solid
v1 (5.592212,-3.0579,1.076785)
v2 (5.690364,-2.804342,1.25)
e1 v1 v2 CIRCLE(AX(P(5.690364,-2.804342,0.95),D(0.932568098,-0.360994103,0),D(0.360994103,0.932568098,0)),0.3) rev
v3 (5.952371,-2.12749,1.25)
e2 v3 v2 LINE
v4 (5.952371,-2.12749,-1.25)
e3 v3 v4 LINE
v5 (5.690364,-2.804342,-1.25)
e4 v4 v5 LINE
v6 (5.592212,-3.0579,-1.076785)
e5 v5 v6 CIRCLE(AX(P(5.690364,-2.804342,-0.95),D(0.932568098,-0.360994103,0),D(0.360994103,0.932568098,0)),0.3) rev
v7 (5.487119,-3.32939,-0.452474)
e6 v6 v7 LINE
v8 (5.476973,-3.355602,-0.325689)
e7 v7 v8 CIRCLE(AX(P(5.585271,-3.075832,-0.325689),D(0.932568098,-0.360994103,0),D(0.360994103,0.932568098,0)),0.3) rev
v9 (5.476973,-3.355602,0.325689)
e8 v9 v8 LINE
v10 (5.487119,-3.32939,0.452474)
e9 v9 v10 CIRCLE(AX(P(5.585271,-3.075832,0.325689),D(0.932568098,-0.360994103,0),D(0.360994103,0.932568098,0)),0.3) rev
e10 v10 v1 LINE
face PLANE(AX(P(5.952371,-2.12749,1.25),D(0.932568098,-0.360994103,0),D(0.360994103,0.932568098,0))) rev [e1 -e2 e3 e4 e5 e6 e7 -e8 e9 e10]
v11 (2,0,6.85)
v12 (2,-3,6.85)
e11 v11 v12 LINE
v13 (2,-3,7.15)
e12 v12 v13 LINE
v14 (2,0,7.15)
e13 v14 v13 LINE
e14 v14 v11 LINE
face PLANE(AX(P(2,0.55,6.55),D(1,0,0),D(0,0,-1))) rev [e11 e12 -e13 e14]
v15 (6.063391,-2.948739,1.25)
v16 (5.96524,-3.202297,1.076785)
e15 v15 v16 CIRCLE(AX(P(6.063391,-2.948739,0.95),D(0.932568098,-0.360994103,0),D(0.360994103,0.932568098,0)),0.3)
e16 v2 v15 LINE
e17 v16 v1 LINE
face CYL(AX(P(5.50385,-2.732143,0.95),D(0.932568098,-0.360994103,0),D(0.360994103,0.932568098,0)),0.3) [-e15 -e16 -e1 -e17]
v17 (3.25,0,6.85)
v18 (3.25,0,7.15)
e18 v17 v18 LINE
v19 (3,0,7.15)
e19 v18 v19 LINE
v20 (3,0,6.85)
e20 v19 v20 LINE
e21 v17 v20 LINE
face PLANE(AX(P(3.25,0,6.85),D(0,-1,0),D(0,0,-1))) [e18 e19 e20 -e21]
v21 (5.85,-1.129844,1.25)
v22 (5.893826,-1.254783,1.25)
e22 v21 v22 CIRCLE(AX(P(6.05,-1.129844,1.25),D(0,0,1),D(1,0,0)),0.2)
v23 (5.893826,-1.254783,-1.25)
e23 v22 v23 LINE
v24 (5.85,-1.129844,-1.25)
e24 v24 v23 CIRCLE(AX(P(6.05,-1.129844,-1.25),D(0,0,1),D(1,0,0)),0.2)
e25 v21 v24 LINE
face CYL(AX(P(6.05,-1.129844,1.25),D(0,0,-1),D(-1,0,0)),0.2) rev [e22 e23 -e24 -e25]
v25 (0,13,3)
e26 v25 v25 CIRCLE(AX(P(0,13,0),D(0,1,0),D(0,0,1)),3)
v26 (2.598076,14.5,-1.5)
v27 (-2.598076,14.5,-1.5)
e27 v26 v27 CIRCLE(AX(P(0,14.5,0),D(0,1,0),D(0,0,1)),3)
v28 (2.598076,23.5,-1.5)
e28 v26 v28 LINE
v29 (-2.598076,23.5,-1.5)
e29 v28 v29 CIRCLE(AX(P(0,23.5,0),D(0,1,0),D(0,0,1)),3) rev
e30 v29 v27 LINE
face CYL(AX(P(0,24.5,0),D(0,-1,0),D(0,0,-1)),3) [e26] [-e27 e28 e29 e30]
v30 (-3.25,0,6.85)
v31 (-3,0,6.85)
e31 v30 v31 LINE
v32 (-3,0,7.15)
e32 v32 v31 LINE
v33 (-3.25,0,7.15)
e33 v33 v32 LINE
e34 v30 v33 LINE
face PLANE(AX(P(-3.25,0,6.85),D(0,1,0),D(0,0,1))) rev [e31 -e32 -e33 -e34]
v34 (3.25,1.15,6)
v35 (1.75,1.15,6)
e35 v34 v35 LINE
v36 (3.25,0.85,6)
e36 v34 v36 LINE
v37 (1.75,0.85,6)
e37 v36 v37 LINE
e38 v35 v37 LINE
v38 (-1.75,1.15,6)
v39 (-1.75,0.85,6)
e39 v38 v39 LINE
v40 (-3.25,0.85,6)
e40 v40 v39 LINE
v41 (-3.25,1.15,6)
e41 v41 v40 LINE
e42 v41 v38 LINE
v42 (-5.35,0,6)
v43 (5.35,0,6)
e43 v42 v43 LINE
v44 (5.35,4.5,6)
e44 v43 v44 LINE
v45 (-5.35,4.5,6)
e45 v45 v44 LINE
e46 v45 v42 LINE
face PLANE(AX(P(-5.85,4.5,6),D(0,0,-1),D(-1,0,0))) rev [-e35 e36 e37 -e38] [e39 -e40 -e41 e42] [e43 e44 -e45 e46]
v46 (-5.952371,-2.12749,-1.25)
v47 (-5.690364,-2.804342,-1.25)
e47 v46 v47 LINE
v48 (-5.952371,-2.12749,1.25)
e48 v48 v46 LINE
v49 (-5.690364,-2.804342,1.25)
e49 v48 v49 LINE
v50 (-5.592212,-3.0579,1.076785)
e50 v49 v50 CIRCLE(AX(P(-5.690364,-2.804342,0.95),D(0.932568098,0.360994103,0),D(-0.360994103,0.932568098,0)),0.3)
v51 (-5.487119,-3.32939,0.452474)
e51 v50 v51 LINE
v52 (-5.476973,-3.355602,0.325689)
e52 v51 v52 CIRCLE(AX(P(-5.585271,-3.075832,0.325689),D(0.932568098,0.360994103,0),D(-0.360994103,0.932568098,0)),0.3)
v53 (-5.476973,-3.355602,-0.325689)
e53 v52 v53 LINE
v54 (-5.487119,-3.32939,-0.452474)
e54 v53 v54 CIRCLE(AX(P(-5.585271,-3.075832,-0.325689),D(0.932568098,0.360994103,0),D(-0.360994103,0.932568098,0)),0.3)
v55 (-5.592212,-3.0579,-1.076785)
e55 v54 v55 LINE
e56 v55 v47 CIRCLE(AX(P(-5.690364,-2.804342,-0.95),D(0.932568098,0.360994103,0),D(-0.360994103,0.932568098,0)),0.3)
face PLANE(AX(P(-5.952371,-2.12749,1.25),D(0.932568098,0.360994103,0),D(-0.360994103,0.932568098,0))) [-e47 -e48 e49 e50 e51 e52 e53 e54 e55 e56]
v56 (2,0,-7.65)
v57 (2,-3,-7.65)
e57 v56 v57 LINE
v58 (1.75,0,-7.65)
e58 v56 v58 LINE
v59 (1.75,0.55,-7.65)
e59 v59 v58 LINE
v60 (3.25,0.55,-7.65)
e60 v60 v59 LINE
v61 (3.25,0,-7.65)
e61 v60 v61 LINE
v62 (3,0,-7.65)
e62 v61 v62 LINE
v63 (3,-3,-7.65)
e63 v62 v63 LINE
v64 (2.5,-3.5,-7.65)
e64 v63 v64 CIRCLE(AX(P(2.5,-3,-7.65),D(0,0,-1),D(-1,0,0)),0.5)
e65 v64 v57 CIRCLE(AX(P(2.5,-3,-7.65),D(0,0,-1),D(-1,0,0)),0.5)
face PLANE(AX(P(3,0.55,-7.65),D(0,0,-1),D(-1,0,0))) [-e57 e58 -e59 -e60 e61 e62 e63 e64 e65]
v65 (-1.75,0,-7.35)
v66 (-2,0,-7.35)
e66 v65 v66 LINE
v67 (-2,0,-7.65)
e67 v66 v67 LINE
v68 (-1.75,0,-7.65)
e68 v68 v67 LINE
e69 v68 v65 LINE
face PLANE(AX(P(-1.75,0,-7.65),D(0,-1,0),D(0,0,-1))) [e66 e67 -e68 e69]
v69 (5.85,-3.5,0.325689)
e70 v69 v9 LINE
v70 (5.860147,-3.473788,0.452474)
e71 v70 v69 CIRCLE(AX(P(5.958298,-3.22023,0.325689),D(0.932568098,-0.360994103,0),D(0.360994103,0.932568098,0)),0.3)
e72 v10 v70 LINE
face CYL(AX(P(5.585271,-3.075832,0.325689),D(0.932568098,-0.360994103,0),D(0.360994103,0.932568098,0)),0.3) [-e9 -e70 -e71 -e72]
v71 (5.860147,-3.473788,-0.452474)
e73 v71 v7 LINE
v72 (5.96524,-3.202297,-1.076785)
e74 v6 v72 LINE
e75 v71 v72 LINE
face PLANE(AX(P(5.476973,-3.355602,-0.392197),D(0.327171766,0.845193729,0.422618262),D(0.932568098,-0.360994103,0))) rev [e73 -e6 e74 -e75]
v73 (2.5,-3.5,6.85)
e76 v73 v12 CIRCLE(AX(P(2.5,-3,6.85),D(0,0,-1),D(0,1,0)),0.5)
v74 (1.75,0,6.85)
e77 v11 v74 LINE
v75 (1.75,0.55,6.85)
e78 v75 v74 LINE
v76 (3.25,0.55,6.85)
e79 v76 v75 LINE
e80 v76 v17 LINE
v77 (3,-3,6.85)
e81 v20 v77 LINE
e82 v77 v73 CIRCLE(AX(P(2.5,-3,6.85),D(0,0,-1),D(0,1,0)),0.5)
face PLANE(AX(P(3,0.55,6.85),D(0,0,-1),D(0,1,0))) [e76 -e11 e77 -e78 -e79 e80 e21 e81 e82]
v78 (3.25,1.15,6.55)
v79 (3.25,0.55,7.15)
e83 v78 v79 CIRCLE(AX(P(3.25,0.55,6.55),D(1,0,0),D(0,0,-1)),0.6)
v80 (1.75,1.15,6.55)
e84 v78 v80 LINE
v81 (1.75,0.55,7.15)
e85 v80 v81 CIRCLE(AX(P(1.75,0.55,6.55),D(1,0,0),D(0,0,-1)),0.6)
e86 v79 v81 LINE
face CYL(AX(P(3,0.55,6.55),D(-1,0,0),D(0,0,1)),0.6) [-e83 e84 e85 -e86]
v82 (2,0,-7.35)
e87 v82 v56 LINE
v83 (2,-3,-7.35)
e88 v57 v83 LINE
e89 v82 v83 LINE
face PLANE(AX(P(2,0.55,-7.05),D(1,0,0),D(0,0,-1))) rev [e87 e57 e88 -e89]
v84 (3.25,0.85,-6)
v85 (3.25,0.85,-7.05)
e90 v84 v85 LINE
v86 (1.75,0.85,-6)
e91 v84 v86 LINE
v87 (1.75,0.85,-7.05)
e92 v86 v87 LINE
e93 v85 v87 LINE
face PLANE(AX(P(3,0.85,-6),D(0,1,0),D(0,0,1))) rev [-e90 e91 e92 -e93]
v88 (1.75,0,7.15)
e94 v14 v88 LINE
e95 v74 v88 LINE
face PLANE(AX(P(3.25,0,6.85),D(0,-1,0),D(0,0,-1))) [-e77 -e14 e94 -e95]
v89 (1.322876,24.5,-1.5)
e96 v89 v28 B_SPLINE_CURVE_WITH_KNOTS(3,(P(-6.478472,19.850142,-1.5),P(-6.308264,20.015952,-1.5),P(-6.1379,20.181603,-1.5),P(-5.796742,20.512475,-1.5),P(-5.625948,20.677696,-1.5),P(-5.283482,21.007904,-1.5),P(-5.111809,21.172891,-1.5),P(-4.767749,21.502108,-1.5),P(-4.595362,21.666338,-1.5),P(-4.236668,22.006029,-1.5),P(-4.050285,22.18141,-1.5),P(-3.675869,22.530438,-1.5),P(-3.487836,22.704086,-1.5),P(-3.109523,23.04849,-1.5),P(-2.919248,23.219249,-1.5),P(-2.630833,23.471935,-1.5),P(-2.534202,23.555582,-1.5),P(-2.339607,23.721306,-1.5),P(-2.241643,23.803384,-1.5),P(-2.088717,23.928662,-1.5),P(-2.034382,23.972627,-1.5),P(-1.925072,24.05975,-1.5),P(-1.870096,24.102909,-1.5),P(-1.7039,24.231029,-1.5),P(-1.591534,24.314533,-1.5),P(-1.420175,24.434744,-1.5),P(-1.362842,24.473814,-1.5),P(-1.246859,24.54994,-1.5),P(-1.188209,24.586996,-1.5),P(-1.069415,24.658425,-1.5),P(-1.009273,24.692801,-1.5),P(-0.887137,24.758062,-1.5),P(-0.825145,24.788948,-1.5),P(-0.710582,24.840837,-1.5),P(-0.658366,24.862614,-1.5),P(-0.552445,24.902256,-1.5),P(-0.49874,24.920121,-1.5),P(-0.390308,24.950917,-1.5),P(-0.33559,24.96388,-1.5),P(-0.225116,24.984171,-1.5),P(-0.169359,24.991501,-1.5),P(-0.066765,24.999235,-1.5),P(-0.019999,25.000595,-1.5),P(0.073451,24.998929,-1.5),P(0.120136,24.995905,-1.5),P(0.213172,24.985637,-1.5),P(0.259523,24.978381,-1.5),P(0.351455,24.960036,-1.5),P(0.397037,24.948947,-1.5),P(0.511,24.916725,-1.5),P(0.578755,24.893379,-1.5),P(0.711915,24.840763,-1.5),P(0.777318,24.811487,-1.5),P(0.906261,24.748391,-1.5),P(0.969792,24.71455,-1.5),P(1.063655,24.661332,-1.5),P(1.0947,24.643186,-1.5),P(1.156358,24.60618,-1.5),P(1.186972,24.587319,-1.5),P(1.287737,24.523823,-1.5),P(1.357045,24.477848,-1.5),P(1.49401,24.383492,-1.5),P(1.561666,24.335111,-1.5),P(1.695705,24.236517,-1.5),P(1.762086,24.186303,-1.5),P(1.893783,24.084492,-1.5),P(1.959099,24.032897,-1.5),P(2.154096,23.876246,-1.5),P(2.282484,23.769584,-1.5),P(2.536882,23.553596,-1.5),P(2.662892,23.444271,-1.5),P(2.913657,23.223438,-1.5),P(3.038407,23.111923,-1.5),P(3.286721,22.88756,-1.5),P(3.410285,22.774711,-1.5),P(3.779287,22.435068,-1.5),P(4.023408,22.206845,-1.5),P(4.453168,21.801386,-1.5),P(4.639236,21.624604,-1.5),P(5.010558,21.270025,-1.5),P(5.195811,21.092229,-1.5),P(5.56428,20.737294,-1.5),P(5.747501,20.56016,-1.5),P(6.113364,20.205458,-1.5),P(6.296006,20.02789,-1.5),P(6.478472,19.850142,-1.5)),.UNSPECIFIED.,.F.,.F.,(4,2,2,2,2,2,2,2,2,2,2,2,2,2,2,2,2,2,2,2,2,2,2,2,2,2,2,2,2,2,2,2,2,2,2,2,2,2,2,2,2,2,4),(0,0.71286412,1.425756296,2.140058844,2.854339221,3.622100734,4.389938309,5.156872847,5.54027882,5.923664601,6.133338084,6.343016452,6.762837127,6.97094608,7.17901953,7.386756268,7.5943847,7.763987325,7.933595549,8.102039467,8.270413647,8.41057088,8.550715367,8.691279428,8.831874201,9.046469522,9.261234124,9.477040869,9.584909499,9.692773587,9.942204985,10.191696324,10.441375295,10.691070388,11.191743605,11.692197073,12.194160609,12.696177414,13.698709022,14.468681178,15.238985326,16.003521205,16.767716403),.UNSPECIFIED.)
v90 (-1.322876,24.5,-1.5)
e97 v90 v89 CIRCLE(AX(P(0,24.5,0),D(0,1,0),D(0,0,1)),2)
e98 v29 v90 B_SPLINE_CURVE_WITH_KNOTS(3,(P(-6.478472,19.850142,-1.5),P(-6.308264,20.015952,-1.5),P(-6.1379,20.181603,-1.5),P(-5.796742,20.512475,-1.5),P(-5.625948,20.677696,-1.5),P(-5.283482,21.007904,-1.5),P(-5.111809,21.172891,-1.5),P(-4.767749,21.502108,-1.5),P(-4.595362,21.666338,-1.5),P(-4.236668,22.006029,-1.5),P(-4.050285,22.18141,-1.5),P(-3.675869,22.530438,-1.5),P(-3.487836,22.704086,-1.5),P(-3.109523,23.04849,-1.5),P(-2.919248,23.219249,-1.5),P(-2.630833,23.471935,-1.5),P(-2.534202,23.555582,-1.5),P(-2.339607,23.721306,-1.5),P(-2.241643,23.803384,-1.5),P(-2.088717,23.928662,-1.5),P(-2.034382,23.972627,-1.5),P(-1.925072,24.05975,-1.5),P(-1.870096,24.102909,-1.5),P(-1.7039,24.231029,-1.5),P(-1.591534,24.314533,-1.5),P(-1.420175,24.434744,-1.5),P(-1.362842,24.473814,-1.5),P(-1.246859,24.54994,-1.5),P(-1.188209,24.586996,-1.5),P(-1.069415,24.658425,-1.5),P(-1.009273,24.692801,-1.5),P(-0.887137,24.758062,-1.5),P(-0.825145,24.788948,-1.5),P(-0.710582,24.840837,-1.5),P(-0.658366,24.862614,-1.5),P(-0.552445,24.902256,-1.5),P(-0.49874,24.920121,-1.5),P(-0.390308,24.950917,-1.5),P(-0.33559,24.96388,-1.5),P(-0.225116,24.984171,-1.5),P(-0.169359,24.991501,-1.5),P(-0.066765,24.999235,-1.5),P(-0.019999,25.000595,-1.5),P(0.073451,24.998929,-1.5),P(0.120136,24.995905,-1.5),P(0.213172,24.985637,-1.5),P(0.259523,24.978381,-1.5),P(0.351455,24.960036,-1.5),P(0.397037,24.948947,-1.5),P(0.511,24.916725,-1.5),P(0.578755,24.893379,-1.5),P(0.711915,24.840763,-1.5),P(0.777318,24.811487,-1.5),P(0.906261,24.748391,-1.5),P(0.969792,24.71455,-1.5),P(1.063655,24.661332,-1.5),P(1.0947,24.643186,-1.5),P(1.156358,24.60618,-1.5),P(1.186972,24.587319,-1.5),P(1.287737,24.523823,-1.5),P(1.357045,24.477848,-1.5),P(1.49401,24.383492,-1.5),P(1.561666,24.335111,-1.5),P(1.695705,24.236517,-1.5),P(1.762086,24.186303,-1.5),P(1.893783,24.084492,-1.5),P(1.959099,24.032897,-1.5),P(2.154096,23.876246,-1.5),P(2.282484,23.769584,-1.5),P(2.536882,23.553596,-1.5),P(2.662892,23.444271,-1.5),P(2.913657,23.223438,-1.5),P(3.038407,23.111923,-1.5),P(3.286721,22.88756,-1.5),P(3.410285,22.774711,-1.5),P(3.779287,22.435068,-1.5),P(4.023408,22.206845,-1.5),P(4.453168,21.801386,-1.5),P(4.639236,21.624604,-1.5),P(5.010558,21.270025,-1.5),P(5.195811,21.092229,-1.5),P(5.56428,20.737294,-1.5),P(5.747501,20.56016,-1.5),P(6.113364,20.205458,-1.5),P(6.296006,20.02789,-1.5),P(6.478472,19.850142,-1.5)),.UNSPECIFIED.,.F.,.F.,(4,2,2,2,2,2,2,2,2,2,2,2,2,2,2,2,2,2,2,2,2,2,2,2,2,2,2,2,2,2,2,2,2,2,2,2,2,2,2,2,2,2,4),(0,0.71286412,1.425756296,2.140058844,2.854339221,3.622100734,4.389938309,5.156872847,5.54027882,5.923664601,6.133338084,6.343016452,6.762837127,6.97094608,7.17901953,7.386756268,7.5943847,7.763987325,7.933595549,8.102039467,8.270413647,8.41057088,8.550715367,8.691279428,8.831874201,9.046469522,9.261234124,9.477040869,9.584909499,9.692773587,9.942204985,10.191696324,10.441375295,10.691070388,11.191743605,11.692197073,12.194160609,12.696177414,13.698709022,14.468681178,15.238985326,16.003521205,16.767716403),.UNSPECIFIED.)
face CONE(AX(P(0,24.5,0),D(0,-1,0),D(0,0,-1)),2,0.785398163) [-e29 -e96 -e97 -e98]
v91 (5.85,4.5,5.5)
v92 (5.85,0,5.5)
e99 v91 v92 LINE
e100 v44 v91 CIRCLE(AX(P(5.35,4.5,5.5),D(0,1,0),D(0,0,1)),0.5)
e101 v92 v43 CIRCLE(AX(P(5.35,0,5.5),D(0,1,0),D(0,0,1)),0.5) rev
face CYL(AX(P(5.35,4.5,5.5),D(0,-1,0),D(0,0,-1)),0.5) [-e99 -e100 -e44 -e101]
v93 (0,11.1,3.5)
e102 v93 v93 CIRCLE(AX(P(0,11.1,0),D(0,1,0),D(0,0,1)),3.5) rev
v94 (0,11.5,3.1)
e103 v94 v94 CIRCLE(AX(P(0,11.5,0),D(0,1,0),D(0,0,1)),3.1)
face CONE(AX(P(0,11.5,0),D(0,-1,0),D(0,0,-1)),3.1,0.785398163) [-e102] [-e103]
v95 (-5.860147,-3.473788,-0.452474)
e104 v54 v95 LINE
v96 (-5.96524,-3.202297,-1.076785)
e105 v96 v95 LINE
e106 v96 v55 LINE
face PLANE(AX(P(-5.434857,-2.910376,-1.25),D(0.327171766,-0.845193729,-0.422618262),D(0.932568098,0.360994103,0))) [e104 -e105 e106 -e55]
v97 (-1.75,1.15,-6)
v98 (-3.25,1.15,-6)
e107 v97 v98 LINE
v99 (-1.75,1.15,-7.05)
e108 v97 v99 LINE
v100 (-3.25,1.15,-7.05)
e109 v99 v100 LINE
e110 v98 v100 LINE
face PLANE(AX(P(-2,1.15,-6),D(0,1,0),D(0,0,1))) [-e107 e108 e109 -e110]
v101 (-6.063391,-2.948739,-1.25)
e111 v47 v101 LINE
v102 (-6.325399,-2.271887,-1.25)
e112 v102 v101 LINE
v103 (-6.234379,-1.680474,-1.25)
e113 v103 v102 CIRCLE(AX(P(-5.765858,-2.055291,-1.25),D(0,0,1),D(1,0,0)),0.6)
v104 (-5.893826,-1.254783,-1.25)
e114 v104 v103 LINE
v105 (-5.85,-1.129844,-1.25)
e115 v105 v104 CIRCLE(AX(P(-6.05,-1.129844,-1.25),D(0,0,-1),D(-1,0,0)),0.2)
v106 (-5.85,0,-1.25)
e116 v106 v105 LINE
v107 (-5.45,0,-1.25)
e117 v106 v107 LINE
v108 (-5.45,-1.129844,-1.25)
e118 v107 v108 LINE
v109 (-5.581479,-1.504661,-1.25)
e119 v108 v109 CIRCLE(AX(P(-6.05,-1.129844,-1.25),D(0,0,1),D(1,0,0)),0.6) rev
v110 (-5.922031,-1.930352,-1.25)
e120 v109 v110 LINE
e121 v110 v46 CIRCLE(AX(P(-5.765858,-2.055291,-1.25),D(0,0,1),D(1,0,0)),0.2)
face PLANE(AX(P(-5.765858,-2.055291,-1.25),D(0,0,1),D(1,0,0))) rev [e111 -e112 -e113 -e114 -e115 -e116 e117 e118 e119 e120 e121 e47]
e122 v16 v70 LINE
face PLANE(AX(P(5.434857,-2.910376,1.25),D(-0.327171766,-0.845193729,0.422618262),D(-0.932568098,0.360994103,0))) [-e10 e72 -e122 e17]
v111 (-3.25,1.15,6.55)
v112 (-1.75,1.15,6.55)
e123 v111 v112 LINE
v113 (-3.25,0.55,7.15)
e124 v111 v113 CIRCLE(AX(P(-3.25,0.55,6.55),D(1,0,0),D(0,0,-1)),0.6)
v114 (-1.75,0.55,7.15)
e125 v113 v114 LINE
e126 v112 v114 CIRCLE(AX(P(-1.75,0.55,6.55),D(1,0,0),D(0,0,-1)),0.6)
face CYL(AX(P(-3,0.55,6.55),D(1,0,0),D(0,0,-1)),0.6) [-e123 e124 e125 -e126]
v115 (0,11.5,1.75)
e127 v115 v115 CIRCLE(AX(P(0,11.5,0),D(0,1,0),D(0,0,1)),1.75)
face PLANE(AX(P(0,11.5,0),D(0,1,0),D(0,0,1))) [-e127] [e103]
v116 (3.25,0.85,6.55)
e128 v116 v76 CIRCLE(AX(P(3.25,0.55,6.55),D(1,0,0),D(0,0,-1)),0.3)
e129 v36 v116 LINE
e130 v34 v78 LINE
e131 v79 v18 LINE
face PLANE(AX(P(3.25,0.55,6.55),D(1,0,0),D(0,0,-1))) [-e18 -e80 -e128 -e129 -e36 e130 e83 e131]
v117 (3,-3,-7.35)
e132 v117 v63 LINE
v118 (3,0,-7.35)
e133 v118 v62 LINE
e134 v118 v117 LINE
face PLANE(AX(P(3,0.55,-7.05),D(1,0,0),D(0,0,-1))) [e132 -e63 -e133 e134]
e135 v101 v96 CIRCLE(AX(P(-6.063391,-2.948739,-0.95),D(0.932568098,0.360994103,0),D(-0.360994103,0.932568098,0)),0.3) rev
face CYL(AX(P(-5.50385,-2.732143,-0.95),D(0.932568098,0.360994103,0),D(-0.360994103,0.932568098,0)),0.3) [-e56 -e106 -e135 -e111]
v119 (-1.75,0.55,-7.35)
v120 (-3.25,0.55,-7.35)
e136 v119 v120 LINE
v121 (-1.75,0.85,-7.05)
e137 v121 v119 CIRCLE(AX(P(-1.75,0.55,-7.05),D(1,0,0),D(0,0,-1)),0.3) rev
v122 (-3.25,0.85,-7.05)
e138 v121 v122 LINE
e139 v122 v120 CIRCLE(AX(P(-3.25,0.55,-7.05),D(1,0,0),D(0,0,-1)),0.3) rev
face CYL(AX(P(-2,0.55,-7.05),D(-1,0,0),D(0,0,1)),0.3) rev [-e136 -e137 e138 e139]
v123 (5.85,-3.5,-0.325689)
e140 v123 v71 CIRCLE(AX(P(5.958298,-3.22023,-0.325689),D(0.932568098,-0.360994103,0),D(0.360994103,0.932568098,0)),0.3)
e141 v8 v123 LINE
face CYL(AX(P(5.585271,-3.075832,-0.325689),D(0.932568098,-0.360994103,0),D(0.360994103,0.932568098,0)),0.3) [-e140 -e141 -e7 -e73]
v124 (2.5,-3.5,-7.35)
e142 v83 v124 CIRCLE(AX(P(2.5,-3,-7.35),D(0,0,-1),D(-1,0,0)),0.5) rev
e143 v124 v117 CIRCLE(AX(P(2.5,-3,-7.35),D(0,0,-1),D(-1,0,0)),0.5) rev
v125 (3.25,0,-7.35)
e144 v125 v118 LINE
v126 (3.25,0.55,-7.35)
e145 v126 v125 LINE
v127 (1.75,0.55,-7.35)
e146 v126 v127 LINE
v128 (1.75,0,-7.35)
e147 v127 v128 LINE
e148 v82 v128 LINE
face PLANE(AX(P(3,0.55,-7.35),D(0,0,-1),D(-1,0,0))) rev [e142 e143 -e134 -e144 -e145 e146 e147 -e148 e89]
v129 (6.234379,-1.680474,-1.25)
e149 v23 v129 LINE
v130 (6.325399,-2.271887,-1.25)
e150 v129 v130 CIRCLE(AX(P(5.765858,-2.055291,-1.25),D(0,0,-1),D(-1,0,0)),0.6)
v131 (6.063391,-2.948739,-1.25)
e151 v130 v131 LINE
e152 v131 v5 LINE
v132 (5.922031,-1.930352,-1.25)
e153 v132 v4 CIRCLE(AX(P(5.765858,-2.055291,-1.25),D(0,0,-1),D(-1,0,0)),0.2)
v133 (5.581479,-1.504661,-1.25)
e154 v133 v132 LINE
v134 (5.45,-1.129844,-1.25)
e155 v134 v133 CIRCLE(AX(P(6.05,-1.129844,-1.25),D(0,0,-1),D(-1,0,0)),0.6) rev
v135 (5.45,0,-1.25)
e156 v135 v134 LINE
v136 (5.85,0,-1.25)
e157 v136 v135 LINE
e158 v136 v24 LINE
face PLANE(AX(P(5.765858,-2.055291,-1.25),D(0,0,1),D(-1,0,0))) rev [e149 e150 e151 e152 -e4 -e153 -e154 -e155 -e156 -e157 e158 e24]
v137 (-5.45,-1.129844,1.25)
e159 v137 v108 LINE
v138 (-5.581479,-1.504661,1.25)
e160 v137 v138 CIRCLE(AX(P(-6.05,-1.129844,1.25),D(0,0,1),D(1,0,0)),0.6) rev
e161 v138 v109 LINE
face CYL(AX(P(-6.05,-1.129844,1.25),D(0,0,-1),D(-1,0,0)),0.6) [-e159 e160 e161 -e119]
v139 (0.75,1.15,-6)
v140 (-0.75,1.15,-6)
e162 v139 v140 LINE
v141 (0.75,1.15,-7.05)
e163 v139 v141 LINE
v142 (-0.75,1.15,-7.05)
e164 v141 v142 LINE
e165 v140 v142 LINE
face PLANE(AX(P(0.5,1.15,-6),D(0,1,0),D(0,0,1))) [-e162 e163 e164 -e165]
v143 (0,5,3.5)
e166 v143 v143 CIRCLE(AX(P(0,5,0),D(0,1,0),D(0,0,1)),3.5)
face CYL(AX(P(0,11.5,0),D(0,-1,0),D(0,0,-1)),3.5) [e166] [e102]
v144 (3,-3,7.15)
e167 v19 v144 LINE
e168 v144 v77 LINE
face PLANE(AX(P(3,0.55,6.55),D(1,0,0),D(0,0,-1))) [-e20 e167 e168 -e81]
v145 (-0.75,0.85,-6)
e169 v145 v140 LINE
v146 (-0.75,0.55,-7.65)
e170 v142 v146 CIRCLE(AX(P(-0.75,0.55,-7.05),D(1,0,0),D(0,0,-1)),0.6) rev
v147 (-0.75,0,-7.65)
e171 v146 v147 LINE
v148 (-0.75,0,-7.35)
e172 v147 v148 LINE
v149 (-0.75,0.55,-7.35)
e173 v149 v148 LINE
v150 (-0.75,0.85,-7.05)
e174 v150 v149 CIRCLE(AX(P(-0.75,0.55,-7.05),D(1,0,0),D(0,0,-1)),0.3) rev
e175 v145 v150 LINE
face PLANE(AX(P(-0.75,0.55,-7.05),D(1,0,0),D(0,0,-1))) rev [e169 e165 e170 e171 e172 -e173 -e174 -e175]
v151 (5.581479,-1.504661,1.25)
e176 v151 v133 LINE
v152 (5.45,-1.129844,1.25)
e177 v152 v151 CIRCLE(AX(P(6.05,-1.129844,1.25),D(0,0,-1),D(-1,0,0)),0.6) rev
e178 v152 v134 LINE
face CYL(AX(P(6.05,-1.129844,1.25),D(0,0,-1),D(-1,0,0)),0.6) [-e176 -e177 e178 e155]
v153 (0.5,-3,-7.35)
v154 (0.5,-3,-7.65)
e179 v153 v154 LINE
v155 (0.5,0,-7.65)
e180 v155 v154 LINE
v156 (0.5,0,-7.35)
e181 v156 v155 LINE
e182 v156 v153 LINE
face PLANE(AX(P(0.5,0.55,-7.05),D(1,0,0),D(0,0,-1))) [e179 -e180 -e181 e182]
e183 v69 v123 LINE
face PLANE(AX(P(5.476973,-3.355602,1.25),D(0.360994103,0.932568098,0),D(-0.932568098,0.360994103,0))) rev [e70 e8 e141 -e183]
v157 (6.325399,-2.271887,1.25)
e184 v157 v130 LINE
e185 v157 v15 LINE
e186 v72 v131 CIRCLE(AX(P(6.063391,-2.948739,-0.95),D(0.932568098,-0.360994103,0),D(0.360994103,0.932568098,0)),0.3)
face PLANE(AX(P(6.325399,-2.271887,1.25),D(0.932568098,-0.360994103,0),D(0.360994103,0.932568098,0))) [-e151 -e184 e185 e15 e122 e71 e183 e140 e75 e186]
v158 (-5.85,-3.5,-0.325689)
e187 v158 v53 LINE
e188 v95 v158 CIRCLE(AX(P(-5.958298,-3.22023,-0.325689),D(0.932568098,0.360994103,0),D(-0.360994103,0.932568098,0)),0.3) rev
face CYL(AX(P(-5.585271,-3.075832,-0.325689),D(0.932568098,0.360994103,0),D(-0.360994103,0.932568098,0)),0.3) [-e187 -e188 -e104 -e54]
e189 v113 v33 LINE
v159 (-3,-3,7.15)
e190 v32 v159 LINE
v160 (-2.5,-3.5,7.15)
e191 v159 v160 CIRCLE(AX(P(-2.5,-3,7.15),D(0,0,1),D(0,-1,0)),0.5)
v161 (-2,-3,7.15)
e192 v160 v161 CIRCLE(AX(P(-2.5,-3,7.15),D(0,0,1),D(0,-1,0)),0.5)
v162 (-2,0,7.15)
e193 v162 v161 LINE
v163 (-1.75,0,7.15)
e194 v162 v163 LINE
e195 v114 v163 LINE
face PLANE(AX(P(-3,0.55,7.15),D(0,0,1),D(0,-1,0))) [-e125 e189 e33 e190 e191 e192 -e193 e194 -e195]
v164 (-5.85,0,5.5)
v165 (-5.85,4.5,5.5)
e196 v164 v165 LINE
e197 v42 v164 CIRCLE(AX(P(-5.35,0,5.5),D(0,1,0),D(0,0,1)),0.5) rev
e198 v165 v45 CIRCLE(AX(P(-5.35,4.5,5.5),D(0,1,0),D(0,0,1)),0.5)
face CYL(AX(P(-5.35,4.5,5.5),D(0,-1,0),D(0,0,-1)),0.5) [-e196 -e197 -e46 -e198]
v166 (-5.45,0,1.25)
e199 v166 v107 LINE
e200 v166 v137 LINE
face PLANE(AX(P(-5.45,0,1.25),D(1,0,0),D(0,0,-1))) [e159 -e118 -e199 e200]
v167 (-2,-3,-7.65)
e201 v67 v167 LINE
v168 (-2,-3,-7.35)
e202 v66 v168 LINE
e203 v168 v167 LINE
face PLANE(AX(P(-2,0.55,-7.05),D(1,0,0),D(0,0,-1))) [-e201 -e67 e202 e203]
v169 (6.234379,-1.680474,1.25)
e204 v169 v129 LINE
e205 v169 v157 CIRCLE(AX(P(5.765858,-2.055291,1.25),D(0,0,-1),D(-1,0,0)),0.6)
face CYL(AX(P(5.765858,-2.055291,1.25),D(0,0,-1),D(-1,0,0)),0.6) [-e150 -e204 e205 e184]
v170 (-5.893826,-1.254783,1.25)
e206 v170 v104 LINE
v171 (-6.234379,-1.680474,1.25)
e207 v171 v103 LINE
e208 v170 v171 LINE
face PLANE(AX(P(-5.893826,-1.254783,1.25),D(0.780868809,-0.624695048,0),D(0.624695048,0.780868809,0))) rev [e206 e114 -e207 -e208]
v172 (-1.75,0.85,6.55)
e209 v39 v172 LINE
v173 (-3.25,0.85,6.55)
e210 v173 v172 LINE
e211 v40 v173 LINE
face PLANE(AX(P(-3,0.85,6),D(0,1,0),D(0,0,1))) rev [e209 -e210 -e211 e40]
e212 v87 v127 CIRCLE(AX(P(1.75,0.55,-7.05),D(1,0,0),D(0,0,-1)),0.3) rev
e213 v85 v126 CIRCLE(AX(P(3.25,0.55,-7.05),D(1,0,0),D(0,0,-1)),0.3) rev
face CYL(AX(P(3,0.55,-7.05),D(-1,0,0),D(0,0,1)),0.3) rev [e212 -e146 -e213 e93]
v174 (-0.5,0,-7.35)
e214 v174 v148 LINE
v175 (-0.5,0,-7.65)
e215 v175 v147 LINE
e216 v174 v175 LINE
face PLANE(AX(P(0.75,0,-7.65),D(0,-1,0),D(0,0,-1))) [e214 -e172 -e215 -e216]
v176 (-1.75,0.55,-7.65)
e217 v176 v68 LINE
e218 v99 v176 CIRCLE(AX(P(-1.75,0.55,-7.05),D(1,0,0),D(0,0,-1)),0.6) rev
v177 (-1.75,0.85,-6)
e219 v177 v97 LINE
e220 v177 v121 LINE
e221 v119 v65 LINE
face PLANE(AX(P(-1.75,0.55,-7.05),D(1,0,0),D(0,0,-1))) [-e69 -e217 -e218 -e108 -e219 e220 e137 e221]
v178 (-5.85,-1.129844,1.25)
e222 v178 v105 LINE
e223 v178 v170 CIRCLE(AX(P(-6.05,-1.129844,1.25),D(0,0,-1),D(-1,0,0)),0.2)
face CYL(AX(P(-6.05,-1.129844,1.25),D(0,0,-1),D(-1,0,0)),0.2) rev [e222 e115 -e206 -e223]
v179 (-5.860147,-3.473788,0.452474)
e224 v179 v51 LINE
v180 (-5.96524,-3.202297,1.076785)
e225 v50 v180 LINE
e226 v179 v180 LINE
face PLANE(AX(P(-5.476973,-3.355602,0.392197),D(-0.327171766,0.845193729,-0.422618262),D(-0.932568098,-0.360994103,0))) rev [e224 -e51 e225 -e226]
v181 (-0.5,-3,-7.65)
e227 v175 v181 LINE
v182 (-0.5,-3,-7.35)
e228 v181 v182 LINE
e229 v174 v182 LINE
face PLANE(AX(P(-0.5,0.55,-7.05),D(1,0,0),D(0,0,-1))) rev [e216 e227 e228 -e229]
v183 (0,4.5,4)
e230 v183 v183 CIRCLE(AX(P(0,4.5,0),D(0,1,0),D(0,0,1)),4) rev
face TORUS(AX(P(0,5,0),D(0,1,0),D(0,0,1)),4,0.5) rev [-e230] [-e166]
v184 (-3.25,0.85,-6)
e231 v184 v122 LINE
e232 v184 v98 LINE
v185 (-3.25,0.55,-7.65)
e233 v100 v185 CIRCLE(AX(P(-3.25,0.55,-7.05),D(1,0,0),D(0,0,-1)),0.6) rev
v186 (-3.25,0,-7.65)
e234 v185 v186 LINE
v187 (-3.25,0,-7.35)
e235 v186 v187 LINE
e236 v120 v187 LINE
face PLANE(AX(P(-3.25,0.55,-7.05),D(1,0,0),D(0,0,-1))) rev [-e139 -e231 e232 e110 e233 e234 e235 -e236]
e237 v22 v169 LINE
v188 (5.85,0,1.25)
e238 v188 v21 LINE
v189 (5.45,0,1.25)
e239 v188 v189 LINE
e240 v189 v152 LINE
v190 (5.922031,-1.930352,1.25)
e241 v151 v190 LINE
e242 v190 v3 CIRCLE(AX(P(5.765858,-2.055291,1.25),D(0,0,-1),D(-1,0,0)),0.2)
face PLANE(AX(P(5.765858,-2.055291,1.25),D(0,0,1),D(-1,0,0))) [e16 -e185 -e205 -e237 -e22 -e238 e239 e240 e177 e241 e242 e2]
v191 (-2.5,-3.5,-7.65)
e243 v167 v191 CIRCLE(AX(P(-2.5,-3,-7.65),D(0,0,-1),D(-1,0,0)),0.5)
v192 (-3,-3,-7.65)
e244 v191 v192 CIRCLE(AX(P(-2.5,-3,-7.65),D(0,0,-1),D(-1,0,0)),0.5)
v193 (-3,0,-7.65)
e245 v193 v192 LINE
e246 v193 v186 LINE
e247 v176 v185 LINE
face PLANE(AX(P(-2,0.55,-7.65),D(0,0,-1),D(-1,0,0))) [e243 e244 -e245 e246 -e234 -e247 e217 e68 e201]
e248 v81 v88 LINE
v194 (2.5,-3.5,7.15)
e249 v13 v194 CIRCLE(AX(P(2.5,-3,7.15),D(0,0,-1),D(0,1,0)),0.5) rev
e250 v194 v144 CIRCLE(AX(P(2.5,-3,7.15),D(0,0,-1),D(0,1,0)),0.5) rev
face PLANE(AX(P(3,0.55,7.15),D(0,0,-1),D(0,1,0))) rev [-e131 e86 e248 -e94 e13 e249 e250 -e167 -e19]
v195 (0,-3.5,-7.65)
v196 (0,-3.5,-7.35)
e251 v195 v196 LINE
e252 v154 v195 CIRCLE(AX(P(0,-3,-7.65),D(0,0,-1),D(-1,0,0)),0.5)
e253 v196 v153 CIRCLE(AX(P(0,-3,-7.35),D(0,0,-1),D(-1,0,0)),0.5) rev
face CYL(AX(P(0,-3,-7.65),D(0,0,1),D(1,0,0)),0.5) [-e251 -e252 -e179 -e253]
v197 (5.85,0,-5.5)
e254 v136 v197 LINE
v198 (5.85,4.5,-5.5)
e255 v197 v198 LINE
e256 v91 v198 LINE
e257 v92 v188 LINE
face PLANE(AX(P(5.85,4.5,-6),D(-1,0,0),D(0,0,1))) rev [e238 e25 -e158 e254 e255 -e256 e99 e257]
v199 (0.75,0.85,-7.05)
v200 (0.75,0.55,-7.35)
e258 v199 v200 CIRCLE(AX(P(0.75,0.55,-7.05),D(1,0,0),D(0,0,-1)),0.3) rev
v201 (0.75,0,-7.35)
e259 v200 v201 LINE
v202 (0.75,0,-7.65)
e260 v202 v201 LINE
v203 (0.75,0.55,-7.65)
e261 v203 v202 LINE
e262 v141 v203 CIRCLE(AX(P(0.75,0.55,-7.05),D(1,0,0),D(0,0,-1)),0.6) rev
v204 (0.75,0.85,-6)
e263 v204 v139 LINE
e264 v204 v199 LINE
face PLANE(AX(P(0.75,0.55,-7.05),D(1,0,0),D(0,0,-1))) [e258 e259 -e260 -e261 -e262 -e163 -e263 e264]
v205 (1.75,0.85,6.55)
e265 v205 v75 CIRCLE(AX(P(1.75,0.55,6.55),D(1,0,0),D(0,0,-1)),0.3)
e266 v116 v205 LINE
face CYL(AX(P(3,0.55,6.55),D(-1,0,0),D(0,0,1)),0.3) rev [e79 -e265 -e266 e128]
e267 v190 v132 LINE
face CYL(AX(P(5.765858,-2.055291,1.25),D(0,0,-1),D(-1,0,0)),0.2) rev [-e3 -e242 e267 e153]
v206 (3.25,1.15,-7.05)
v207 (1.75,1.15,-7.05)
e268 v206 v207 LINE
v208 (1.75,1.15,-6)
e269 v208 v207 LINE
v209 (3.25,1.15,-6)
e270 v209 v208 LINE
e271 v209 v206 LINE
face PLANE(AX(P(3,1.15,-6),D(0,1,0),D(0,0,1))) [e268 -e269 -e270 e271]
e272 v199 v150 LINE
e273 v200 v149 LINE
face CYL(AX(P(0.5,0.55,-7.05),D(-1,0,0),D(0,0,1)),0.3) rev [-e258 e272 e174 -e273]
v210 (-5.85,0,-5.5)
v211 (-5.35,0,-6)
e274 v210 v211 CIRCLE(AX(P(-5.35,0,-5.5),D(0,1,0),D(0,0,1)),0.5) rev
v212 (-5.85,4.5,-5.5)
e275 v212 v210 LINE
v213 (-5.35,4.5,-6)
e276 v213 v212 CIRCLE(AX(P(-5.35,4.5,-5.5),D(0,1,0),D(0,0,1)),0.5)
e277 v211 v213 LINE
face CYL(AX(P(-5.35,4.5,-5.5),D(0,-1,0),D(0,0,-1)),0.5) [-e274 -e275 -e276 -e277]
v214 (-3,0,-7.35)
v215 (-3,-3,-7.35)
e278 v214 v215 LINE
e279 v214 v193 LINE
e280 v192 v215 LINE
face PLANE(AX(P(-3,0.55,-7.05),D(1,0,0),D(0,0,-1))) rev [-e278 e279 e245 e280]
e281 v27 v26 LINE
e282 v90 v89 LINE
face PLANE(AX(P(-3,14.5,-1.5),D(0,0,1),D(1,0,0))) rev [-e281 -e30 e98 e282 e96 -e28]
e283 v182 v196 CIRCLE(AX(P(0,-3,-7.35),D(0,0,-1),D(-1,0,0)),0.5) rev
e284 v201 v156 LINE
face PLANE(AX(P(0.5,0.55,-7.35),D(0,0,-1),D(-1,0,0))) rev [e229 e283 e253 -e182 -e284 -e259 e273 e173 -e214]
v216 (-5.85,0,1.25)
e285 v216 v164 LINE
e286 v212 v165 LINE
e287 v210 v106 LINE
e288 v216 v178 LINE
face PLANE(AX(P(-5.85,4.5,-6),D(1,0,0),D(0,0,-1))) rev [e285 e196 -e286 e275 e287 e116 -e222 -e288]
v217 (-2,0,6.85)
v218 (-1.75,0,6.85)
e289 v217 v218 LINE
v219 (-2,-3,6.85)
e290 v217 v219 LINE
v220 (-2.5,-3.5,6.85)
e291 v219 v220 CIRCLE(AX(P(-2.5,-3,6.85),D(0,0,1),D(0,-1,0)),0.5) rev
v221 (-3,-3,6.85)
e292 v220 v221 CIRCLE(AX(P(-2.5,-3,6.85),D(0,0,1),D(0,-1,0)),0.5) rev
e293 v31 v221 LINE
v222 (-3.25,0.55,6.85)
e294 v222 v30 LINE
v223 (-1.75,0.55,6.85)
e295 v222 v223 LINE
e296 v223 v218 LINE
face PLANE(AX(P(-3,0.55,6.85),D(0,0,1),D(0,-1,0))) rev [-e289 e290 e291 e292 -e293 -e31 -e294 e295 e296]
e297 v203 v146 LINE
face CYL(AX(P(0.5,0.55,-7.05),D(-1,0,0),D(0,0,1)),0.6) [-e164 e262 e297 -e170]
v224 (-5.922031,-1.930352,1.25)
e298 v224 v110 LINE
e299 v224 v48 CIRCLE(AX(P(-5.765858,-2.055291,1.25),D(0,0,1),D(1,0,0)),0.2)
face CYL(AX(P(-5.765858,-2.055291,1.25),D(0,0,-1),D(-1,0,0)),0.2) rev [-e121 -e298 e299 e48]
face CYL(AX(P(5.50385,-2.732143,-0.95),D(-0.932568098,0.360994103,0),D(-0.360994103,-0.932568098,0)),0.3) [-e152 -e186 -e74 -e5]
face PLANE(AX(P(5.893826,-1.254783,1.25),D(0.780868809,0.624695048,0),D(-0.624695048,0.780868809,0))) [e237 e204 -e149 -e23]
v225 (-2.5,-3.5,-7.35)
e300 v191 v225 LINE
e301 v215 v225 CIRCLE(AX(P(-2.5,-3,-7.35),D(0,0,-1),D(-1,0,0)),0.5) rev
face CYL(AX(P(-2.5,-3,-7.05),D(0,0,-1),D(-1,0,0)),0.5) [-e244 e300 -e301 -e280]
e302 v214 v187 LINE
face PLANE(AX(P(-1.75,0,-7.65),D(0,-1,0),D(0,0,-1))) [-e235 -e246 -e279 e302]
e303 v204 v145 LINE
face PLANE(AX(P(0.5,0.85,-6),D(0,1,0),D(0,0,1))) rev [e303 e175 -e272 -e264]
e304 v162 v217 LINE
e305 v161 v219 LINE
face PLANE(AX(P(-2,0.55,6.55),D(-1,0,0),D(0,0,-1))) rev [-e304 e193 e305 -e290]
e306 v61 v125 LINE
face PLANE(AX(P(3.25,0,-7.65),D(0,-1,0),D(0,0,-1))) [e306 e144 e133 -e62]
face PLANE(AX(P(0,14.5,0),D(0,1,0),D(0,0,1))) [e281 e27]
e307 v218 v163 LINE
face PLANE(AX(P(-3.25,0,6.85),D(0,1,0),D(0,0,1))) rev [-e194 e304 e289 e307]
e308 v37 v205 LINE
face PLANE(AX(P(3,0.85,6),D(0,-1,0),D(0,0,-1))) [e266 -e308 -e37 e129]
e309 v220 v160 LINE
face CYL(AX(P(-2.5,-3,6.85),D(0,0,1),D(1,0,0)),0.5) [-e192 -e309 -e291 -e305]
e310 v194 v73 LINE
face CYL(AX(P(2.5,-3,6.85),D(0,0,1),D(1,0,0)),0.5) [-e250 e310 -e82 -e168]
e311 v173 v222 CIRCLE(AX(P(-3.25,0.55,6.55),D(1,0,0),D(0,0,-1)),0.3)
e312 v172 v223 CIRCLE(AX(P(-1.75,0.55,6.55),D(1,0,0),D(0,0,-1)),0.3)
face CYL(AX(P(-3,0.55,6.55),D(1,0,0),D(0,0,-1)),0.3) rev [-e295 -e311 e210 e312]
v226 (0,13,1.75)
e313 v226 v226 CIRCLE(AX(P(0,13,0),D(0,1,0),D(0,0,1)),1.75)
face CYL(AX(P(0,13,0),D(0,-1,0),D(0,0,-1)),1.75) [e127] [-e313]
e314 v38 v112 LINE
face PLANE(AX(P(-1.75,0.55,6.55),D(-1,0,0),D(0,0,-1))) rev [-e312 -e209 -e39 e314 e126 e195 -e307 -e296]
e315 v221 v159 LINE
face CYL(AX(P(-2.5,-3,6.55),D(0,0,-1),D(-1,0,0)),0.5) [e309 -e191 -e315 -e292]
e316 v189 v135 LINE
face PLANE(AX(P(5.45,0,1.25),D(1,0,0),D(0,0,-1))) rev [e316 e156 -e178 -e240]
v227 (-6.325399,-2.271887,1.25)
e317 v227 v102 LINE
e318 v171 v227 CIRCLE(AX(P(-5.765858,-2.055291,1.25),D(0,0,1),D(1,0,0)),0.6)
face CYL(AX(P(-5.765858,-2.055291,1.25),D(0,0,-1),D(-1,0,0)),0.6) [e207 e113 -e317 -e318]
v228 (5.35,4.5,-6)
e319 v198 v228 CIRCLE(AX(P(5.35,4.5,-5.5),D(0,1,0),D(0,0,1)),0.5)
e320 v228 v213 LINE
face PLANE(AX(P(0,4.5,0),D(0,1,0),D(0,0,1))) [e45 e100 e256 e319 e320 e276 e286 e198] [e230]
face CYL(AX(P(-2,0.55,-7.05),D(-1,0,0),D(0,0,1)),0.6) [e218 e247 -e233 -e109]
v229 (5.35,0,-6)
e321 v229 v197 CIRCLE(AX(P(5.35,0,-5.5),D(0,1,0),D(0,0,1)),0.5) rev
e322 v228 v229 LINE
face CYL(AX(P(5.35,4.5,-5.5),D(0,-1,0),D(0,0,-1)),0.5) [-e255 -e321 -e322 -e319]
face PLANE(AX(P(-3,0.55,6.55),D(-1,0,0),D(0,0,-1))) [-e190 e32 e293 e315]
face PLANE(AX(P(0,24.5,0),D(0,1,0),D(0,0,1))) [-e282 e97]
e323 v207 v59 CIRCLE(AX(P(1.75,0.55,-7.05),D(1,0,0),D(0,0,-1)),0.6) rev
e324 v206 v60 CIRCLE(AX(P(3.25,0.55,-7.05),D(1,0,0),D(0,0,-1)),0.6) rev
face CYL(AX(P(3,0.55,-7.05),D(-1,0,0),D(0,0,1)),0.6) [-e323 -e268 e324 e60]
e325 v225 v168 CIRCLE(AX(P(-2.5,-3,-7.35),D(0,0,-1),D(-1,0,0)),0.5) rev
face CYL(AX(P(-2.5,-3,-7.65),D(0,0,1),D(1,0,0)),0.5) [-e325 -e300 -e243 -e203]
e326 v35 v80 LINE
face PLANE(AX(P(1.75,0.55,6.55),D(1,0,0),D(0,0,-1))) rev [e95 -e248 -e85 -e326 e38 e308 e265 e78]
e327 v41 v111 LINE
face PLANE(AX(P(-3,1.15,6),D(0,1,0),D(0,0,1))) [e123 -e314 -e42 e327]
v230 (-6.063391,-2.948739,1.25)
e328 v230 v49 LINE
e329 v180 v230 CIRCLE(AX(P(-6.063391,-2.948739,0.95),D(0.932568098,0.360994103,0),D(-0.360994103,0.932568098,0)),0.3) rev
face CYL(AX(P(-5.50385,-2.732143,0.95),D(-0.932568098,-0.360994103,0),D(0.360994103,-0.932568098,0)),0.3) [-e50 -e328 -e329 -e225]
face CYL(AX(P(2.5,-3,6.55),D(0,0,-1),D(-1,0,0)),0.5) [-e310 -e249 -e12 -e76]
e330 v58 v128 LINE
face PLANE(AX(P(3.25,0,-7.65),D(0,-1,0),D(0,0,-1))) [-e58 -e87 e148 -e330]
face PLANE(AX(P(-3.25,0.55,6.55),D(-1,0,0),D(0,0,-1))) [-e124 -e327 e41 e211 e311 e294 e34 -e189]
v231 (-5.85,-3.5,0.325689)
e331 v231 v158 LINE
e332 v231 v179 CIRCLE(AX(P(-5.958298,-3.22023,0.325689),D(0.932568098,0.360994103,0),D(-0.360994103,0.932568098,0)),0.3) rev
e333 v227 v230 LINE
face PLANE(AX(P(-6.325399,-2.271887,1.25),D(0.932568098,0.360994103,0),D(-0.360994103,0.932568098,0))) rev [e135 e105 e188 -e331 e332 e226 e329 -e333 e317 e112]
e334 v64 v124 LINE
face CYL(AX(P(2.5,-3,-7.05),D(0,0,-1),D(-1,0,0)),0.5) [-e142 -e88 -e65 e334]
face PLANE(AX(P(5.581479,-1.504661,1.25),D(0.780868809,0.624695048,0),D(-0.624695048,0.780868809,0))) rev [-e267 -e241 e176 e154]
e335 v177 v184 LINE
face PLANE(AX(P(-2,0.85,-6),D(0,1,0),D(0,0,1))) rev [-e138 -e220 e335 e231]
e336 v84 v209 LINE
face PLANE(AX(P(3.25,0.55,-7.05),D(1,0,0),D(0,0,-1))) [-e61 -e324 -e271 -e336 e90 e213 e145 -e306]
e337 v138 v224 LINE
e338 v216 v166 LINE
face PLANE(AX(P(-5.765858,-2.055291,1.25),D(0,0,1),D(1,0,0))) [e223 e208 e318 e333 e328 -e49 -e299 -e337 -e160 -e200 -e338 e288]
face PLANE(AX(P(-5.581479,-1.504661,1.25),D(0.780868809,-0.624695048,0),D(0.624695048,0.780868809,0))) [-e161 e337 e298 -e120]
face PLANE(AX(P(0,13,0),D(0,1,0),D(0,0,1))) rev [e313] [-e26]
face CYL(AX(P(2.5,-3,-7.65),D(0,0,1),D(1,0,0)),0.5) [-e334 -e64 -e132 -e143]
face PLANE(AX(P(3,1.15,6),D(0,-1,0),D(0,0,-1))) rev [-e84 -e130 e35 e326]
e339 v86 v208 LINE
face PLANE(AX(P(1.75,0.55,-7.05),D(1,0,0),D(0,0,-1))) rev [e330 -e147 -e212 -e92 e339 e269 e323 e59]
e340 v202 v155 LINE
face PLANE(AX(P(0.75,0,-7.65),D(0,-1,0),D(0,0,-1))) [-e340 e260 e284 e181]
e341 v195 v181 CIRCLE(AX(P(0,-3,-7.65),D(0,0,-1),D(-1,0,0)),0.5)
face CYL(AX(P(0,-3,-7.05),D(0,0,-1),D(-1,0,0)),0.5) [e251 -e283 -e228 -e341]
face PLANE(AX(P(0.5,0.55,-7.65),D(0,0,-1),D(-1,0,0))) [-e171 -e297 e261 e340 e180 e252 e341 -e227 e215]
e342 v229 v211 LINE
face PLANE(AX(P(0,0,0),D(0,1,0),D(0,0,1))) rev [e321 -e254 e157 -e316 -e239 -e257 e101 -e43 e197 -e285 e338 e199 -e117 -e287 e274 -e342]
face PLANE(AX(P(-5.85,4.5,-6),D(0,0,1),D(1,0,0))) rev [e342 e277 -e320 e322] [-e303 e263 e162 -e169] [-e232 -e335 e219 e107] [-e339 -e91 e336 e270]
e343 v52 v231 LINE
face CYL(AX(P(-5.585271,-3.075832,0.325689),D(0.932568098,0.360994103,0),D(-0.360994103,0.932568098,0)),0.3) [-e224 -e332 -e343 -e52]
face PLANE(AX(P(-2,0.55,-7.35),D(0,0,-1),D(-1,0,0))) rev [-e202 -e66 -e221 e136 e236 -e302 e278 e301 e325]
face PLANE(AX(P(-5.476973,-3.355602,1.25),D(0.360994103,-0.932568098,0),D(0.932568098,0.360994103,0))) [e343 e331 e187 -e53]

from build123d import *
from OCP.BRepFilletAPI import BRepFilletAPI_MakeChamfer

# Parameters (mm, degrees)
SKETCH_1_W                         = 11.7
SKETCH_1_H                         = 12
EXTRUDE_1_DEPTH                    = 4.5
SKETCH_9_R                         = 3.5
EXTRUDE_2_DEPTH                    = 11.5
SKETCH_10_R                        = 1.75
EXTRUDE_3_DEPTH                    = 1.5
SKETCH_11_R                        = 3
EXTRUDE_4_DEPTH                    = 11.5
CHAMFER_1_SIZE                     = 1
CHAMFER_2_SIZE                     = 0.4
SKETCH_12_W                        = 6
SKETCH_12_H                        = 1.5
CUT_EXTRUDE_1_DEPTH                = 10
FILLET_1_R                         = 0.5
FILLET_2_R                         = 0.5
EXTRUDE_1_2_DEPTH                  = 1.25
CHAMFER_3_SIZE                     = 0.4
CHAMFER_3_SIZE2                    = 0.857802768
FILLET_3_R                         = 0.3
CHAMFER_3_OF_MIRROR_1_SIZE         = 0.4
CHAMFER_3_OF_MIRROR_1_SIZE2        = 0.857802768
FILLET_3_OF_MIRROR_1_R             = 0.3
EXTRUDE_2_2_DEPTH                  = 0.5
EXTRUDE_3_2_DEPTH                  = 0.75
FILLET_4_R                         = 0.5
PATTERN_LINEAR_1_COUNT             = 2
PATTERN_LINEAR_1_PITCH             = 2.5
FILLET_4_OF_PATTERN_LINEAR_1_R     = 0.5
PATTERN_LINEAR_1_COL_COUNT         = 2
PATTERN_LINEAR_1_COL_PITCH         = 2.5
FILLET_4_OF_PATTERN_LINEAR_1_COL_R = 0.5
EXTRUDE_START                      = 2.5
EXTRUDE_4_2_DEPTH                  = 0.5
EXTRUDE_5_DEPTH                    = 0.75
FILLET_5_R                         = 0.5
FILLET_5_OF_MIRROR_2_R             = 0.5


with BuildPart() as part:
    # Эскиз1 → Extrude 1 (new body)
    with BuildSketch(Plane(origin=(0, 0, 0), x_dir=(1, 0, 0), z_dir=(0, 1, 0))):
        Rectangle(SKETCH_1_W, SKETCH_1_H)
    extrude(amount=EXTRUDE_1_DEPTH)

    # Эскиз9 → Extrude 2 (add)
    with BuildSketch(Plane(origin=(0, 0, 0), x_dir=(1, 0, 0), z_dir=(0, 1, 0))):
        with Locations(Location((0, 0, 0), (0, 0, 270))):
            Circle(SKETCH_9_R)
    extrude(amount=EXTRUDE_2_DEPTH)

    # Эскиз10 → Extrude 3 (add)
    with BuildSketch(Plane(origin=(0, 11.5, 0), x_dir=(1, 0, 0), z_dir=(0, 1, 0))):
        with Locations(Location((0, 0, 0), (0, 0, 270))):
            Circle(SKETCH_10_R)
    extrude(amount=EXTRUDE_3_DEPTH)

    # Эскиз11 → Extrude 4 (add)
    with BuildSketch(Plane(origin=(0, 13, 0), x_dir=(1, 0, 0), z_dir=(0, 1, 0))):
        with Locations(Location((0, 0, 0), (0, 0, 270))):
            Circle(SKETCH_11_R)
    extrude(amount=EXTRUDE_4_DEPTH)

    # Фаска1
    chamfer_1_edges = [part.edges().sort_by_distance(p)[0] for p in [
        (0, 24.5, -3),
    ]]
    chamfer(chamfer_1_edges, length=CHAMFER_1_SIZE)

    # Фаска2
    chamfer_2_edges = [part.edges().sort_by_distance(p)[0] for p in [
        (0, 11.5, -3.5),
    ]]
    chamfer(chamfer_2_edges, length=CHAMFER_2_SIZE)

    # Эскиз12 → Вырез-Вытянуть1 (cut)
    with BuildSketch(Plane(origin=(0, 24.5, 0), x_dir=(1, 0, 0), z_dir=(0, 1, 0))):
        with Locations((0, 2.25)):
            Rectangle(SKETCH_12_W, SKETCH_12_H)
    extrude(amount=-CUT_EXTRUDE_1_DEPTH, mode=Mode.SUBTRACT)

    # Скругление1
    fillet_1_edges = [part.edges().sort_by_distance(p)[0] for p in [
        (0, 4.5, -3.5),
    ]]
    fillet(fillet_1_edges, radius=FILLET_1_R)

    # Скругление2
    fillet_2_edges = [part.edges().sort_by_distance(p)[0] for p in [
        (5.85, 2.25, 6),
        (-5.85, 2.25, 6),
        (-5.85, 2.25, -6),
        (5.85, 2.25, -6),
    ]]
    fillet(fillet_2_edges, radius=FILLET_2_R)

    # Эскиз13 → Extrude 1 2 (add, symmetric)
    with BuildSketch(Plane.XY):
        with BuildLine():
            Line((-5.85, 0), (-5.85, -1.129843788))
            ThreePointArc((-5.85, -1.129843788), (-5.861274336, -1.196045176), (-5.893826238, -1.254782798))
            Line((-5.893826238, -1.254782798), (-6.234378942, -1.680473678))
            ThreePointArc((-6.234378942, -1.680473678), (-6.358875719, -1.964024187), (-6.325398516, -2.271887168))
            Line((-6.325398516, -2.271887168), (-5.85, -3.5))
            Line((-5.85, -3.5), (-5.476972761, -3.355602359))
            Line((-5.476972761, -3.355602359), (-5.952371276, -2.127489527))
            ThreePointArc((-5.952371276, -2.127489527), (-5.963530344, -2.024868533), (-5.922031419, -1.930351697))
            Line((-5.922031419, -1.930351697), (-5.581478714, -1.504660817))
            ThreePointArc((-5.581478714, -1.504660817), (-5.483823009, -1.328447953), (-5.45, -1.129843788))
            Line((-5.45, -1.129843788), (-5.45, 0))
            Line((-5.45, 0), (-5.85, 0))
        make_face()
    extrude_1_2 = extrude(amount=EXTRUDE_1_2_DEPTH, both=True)

    # Фаска3: one chamfer whose edges measure the first distance from different faces: ONE call of the kernel's chamfer builder (chamfer() names one face for all edges)
    chamfer_3_edges_1 = [part.edges().sort_by_distance(p)[0] for p in [
        (-5.66348638, -3.427801179, 1.25),
    ]]
    chamfer_3_side_1 = [part.faces().sort_by_distance(p)[0] for p in [
        (-5.837614818, -1.735838174, 1.25),
    ]]
    chamfer_3_edges_2 = [part.edges().sort_by_distance(p)[0] for p in [
        (-5.66348638, -3.427801179, -1.25),
    ]]
    chamfer_3_side_2 = [part.faces().sort_by_distance(p)[0] for p in [
        (-5.837614818, -1.735838174, -1.25),
    ]]
    chamfer_3 = BRepFilletAPI_MakeChamfer(part.part.solid().wrapped)
    for e in chamfer_3_edges_1:
        chamfer_3.Add(CHAMFER_3_SIZE, CHAMFER_3_SIZE2, e.wrapped, chamfer_3_side_1[0].wrapped)  # the first distance lies on this face
    for e in chamfer_3_edges_2:
        chamfer_3.Add(CHAMFER_3_SIZE, CHAMFER_3_SIZE2, e.wrapped, chamfer_3_side_2[0].wrapped)  # the first distance lies on this face
    add(Compound.cast(chamfer_3.Shape()), mode=Mode.REPLACE)

    # Скругление3
    fillet_3_edges = [part.edges().sort_by_distance(p)[0] for p in [
        (-5.807884021, -3.05477394, -1.25),
        (-5.66348638, -3.427801179, 0.392197232),
        (-5.66348638, -3.427801179, -0.392197232),
        (-5.807884021, -3.05477394, 1.25),
    ]]
    fillet(fillet_3_edges, radius=FILLET_3_R)

    # Зеркальное отражение1: Extrude 1 2 across plane
    add(extrude_1_2.mirror(Plane(origin=(0, 0, 0), x_dir=(0, 0, 1), z_dir=(1, 0, 0))))

    # Фаска3 of Зеркальное отражение1: one chamfer whose edges measure the first distance from different faces: ONE call of the kernel's chamfer builder (chamfer() names one face for all edges)
    chamfer_3_of_mirror_1_edges_1 = [part.edges().sort_by_distance(p)[0] for p in [
        (5.66348638, -3.427801179, 1.25),
    ]]
    chamfer_3_of_mirror_1_side_1 = [part.faces().sort_by_distance(p)[0] for p in [
        (5.837614818, -1.735838174, 1.25),
    ]]
    chamfer_3_of_mirror_1_edges_2 = [part.edges().sort_by_distance(p)[0] for p in [
        (5.66348638, -3.427801179, -1.25),
    ]]
    chamfer_3_of_mirror_1_side_2 = [part.faces().sort_by_distance(p)[0] for p in [
        (5.837614818, -1.735838174, -1.25),
    ]]
    chamfer_3_of_mirror_1 = BRepFilletAPI_MakeChamfer(part.part.solid().wrapped)
    for e in chamfer_3_of_mirror_1_edges_1:
        chamfer_3_of_mirror_1.Add(CHAMFER_3_OF_MIRROR_1_SIZE, CHAMFER_3_OF_MIRROR_1_SIZE2, e.wrapped, chamfer_3_of_mirror_1_side_1[0].wrapped)  # the first distance lies on this face
    for e in chamfer_3_of_mirror_1_edges_2:
        chamfer_3_of_mirror_1.Add(CHAMFER_3_OF_MIRROR_1_SIZE, CHAMFER_3_OF_MIRROR_1_SIZE2, e.wrapped, chamfer_3_of_mirror_1_side_2[0].wrapped)  # the first distance lies on this face
    add(Compound.cast(chamfer_3_of_mirror_1.Shape()), mode=Mode.REPLACE)

    # Скругление3 of Зеркальное отражение1
    fillet_3_of_mirror_1_edges = [part.edges().sort_by_distance(p)[0] for p in [
        (5.807884021, -3.05477394, -1.25),
        (5.66348638, -3.427801179, 0.392197232),
        (5.66348638, -3.427801179, -0.392197232),
        (5.807884021, -3.05477394, 1.25),
    ]]
    fillet(fillet_3_of_mirror_1_edges, radius=FILLET_3_OF_MIRROR_1_R)

    # Эскиз14 → Extrude 2 2 (add, symmetric)
    with BuildSketch(Plane(origin=(0, 0, 0), x_dir=(0, 0, -1), z_dir=(1, 0, 0))):
        with BuildLine():
            Line((6, 0.85), (7.05, 0.85))
            ThreePointArc((7.05, 0.85), (7.262132034, 0.762132034), (7.35, 0.55))
            Line((7.35, 0.55), (7.35, -3.5))
            Line((7.35, -3.5), (7.65, -3.5))
            Line((7.65, -3.5), (7.65, 0.55))
            ThreePointArc((7.65, 0.55), (7.474264069, 0.974264069), (7.05, 1.15))
            Line((7.05, 1.15), (6, 1.15))
            Line((6, 1.15), (6, 0.85))
        make_face()
    extrude_2_2 = extrude(amount=EXTRUDE_2_2_DEPTH, both=True)

    # Эскиз15 → Extrude 3 2 (add, symmetric)
    with BuildSketch(Plane(origin=(0, 0, 0), x_dir=(0, 0, -1), z_dir=(1, 0, 0))):
        with BuildLine():
            Line((6, 0.85), (7.05, 0.85))
            ThreePointArc((7.05, 0.85), (7.262132034, 0.762132034), (7.35, 0.55))
            Line((7.35, 0.55), (7.35, 0))
            Line((7.35, 0), (7.65, 0))
            Line((7.65, 0), (7.65, 0.55))
            ThreePointArc((7.65, 0.55), (7.474264069, 0.974264069), (7.05, 1.15))
            Line((7.05, 1.15), (6, 1.15))
            Line((6, 1.15), (6, 0.85))
        make_face()
    extrude_3_2 = extrude(amount=EXTRUDE_3_2_DEPTH, both=True)

    # Скругление4
    fillet_4_edges = [part.edges().sort_by_distance(p)[0] for p in [
        (-0.5, -3.5, -7.5),
        (0.5, -3.5, -7.5),
    ]]
    fillet(fillet_4_edges, radius=FILLET_4_R - 0.0001)  # a hair under: the kernel refuses the full size

    # Линейный массив1: Extrude 2 2, Extrude 3 2 ×2
    with Locations(*[(i * PATTERN_LINEAR_1_PITCH, 0, 0) for i in range(1, PATTERN_LINEAR_1_COUNT)]):
        add(extrude_2_2)
        add(extrude_3_2)

    # Скругление4 of Линейный массив1
    fillet_4_of_pattern_linear_1_edges = [part.edges().sort_by_distance(p)[0] for p in [
        (2, -3.5, -7.5),
        (3, -3.5, -7.5),
    ]]
    fillet(fillet_4_of_pattern_linear_1_edges, radius=FILLET_4_OF_PATTERN_LINEAR_1_R - 0.0001)  # a hair under: the kernel refuses the full size

    # Линейный массив1 col: Extrude 2 2, Extrude 3 2 ×2
    with Locations(*[(-i * PATTERN_LINEAR_1_COL_PITCH, 0, 0) for i in range(1, PATTERN_LINEAR_1_COL_COUNT)]):
        add(extrude_2_2)
        add(extrude_3_2)

    # Скругление4 of Линейный массив1 col
    fillet_4_of_pattern_linear_1_col_edges = [part.edges().sort_by_distance(p)[0] for p in [
        (-3, -3.5, -7.5),
        (-2, -3.5, -7.5),
    ]]
    fillet(fillet_4_of_pattern_linear_1_col_edges, radius=FILLET_4_OF_PATTERN_LINEAR_1_COL_R - 0.0001)  # a hair under: the kernel refuses the full size

    # Эскиз16 → Extrude 4 2 (add, symmetric)
    with BuildSketch(Plane(origin=(0, 0, 0), x_dir=(0, 0, -1), z_dir=(1, 0, 0)).offset(EXTRUDE_START)):
        with BuildLine():
            Line((-6, 1.15), (-6.55, 1.15))
            ThreePointArc((-6.55, 1.15), (-6.974264069, 0.974264069), (-7.15, 0.55))
            Line((-7.15, 0.55), (-7.15, -3.5))
            Line((-7.15, -3.5), (-6.85, -3.5))
            Line((-6.85, -3.5), (-6.85, 0.55))
            ThreePointArc((-6.85, 0.55), (-6.762132034, 0.762132034), (-6.55, 0.85))
            Line((-6.55, 0.85), (-6, 0.85))
            Line((-6, 0.85), (-6, 1.15))
        make_face()
    extrude_4_2 = extrude(amount=EXTRUDE_4_2_DEPTH, both=True)

    # Эскиз17 → Вытянуть-Тонкостенный5 (add, symmetric)
    with BuildSketch(Plane(origin=(0, 0, 0), x_dir=(0, 0, -1), z_dir=(1, 0, 0)).offset(EXTRUDE_START)):
        with BuildLine():
            Line((-6, 1.15), (-6.55, 1.15))
            ThreePointArc((-6.55, 1.15), (-6.974264069, 0.974264069), (-7.15, 0.55))
            Line((-7.15, 0.55), (-7.15, 0))
            Line((-7.15, 0), (-6.85, 0))
            Line((-6.85, 0), (-6.85, 0.55))
            ThreePointArc((-6.85, 0.55), (-6.762132034, 0.762132034), (-6.55, 0.85))
            Line((-6.55, 0.85), (-6, 0.85))
            Line((-6, 0.85), (-6, 1.15))
        make_face()
    extrude_5 = extrude(amount=EXTRUDE_5_DEPTH, both=True)

    # Скругление5
    fillet_5_edges = [part.edges().sort_by_distance(p)[0] for p in [
        (3, -3.5, 7),
        (2, -3.5, 7),
    ]]
    fillet(fillet_5_edges, radius=FILLET_5_R - 0.0001)  # a hair under: the kernel refuses the full size

    # Зеркальное отражение2: Extrude 4 2, Вытянуть-Тонкостенный5 across plane
    add(extrude_4_2.mirror(Plane(origin=(0, 0, 0), x_dir=(0, 0, 1), z_dir=(1, 0, 0))))
    add(extrude_5.mirror(Plane(origin=(0, 0, 0), x_dir=(0, 0, 1), z_dir=(1, 0, 0))))

    # Скругление5 of Зеркальное отражение2
    fillet_5_of_mirror_2_edges = [part.edges().sort_by_distance(p)[0] for p in [
        (-3, -3.5, 7),
        (-2, -3.5, 7),
    ]]
    fillet(fillet_5_of_mirror_2_edges, radius=FILLET_5_OF_MIRROR_2_R - 0.0001)  # a hair under: the kernel refuses the full size


solid = part.part
